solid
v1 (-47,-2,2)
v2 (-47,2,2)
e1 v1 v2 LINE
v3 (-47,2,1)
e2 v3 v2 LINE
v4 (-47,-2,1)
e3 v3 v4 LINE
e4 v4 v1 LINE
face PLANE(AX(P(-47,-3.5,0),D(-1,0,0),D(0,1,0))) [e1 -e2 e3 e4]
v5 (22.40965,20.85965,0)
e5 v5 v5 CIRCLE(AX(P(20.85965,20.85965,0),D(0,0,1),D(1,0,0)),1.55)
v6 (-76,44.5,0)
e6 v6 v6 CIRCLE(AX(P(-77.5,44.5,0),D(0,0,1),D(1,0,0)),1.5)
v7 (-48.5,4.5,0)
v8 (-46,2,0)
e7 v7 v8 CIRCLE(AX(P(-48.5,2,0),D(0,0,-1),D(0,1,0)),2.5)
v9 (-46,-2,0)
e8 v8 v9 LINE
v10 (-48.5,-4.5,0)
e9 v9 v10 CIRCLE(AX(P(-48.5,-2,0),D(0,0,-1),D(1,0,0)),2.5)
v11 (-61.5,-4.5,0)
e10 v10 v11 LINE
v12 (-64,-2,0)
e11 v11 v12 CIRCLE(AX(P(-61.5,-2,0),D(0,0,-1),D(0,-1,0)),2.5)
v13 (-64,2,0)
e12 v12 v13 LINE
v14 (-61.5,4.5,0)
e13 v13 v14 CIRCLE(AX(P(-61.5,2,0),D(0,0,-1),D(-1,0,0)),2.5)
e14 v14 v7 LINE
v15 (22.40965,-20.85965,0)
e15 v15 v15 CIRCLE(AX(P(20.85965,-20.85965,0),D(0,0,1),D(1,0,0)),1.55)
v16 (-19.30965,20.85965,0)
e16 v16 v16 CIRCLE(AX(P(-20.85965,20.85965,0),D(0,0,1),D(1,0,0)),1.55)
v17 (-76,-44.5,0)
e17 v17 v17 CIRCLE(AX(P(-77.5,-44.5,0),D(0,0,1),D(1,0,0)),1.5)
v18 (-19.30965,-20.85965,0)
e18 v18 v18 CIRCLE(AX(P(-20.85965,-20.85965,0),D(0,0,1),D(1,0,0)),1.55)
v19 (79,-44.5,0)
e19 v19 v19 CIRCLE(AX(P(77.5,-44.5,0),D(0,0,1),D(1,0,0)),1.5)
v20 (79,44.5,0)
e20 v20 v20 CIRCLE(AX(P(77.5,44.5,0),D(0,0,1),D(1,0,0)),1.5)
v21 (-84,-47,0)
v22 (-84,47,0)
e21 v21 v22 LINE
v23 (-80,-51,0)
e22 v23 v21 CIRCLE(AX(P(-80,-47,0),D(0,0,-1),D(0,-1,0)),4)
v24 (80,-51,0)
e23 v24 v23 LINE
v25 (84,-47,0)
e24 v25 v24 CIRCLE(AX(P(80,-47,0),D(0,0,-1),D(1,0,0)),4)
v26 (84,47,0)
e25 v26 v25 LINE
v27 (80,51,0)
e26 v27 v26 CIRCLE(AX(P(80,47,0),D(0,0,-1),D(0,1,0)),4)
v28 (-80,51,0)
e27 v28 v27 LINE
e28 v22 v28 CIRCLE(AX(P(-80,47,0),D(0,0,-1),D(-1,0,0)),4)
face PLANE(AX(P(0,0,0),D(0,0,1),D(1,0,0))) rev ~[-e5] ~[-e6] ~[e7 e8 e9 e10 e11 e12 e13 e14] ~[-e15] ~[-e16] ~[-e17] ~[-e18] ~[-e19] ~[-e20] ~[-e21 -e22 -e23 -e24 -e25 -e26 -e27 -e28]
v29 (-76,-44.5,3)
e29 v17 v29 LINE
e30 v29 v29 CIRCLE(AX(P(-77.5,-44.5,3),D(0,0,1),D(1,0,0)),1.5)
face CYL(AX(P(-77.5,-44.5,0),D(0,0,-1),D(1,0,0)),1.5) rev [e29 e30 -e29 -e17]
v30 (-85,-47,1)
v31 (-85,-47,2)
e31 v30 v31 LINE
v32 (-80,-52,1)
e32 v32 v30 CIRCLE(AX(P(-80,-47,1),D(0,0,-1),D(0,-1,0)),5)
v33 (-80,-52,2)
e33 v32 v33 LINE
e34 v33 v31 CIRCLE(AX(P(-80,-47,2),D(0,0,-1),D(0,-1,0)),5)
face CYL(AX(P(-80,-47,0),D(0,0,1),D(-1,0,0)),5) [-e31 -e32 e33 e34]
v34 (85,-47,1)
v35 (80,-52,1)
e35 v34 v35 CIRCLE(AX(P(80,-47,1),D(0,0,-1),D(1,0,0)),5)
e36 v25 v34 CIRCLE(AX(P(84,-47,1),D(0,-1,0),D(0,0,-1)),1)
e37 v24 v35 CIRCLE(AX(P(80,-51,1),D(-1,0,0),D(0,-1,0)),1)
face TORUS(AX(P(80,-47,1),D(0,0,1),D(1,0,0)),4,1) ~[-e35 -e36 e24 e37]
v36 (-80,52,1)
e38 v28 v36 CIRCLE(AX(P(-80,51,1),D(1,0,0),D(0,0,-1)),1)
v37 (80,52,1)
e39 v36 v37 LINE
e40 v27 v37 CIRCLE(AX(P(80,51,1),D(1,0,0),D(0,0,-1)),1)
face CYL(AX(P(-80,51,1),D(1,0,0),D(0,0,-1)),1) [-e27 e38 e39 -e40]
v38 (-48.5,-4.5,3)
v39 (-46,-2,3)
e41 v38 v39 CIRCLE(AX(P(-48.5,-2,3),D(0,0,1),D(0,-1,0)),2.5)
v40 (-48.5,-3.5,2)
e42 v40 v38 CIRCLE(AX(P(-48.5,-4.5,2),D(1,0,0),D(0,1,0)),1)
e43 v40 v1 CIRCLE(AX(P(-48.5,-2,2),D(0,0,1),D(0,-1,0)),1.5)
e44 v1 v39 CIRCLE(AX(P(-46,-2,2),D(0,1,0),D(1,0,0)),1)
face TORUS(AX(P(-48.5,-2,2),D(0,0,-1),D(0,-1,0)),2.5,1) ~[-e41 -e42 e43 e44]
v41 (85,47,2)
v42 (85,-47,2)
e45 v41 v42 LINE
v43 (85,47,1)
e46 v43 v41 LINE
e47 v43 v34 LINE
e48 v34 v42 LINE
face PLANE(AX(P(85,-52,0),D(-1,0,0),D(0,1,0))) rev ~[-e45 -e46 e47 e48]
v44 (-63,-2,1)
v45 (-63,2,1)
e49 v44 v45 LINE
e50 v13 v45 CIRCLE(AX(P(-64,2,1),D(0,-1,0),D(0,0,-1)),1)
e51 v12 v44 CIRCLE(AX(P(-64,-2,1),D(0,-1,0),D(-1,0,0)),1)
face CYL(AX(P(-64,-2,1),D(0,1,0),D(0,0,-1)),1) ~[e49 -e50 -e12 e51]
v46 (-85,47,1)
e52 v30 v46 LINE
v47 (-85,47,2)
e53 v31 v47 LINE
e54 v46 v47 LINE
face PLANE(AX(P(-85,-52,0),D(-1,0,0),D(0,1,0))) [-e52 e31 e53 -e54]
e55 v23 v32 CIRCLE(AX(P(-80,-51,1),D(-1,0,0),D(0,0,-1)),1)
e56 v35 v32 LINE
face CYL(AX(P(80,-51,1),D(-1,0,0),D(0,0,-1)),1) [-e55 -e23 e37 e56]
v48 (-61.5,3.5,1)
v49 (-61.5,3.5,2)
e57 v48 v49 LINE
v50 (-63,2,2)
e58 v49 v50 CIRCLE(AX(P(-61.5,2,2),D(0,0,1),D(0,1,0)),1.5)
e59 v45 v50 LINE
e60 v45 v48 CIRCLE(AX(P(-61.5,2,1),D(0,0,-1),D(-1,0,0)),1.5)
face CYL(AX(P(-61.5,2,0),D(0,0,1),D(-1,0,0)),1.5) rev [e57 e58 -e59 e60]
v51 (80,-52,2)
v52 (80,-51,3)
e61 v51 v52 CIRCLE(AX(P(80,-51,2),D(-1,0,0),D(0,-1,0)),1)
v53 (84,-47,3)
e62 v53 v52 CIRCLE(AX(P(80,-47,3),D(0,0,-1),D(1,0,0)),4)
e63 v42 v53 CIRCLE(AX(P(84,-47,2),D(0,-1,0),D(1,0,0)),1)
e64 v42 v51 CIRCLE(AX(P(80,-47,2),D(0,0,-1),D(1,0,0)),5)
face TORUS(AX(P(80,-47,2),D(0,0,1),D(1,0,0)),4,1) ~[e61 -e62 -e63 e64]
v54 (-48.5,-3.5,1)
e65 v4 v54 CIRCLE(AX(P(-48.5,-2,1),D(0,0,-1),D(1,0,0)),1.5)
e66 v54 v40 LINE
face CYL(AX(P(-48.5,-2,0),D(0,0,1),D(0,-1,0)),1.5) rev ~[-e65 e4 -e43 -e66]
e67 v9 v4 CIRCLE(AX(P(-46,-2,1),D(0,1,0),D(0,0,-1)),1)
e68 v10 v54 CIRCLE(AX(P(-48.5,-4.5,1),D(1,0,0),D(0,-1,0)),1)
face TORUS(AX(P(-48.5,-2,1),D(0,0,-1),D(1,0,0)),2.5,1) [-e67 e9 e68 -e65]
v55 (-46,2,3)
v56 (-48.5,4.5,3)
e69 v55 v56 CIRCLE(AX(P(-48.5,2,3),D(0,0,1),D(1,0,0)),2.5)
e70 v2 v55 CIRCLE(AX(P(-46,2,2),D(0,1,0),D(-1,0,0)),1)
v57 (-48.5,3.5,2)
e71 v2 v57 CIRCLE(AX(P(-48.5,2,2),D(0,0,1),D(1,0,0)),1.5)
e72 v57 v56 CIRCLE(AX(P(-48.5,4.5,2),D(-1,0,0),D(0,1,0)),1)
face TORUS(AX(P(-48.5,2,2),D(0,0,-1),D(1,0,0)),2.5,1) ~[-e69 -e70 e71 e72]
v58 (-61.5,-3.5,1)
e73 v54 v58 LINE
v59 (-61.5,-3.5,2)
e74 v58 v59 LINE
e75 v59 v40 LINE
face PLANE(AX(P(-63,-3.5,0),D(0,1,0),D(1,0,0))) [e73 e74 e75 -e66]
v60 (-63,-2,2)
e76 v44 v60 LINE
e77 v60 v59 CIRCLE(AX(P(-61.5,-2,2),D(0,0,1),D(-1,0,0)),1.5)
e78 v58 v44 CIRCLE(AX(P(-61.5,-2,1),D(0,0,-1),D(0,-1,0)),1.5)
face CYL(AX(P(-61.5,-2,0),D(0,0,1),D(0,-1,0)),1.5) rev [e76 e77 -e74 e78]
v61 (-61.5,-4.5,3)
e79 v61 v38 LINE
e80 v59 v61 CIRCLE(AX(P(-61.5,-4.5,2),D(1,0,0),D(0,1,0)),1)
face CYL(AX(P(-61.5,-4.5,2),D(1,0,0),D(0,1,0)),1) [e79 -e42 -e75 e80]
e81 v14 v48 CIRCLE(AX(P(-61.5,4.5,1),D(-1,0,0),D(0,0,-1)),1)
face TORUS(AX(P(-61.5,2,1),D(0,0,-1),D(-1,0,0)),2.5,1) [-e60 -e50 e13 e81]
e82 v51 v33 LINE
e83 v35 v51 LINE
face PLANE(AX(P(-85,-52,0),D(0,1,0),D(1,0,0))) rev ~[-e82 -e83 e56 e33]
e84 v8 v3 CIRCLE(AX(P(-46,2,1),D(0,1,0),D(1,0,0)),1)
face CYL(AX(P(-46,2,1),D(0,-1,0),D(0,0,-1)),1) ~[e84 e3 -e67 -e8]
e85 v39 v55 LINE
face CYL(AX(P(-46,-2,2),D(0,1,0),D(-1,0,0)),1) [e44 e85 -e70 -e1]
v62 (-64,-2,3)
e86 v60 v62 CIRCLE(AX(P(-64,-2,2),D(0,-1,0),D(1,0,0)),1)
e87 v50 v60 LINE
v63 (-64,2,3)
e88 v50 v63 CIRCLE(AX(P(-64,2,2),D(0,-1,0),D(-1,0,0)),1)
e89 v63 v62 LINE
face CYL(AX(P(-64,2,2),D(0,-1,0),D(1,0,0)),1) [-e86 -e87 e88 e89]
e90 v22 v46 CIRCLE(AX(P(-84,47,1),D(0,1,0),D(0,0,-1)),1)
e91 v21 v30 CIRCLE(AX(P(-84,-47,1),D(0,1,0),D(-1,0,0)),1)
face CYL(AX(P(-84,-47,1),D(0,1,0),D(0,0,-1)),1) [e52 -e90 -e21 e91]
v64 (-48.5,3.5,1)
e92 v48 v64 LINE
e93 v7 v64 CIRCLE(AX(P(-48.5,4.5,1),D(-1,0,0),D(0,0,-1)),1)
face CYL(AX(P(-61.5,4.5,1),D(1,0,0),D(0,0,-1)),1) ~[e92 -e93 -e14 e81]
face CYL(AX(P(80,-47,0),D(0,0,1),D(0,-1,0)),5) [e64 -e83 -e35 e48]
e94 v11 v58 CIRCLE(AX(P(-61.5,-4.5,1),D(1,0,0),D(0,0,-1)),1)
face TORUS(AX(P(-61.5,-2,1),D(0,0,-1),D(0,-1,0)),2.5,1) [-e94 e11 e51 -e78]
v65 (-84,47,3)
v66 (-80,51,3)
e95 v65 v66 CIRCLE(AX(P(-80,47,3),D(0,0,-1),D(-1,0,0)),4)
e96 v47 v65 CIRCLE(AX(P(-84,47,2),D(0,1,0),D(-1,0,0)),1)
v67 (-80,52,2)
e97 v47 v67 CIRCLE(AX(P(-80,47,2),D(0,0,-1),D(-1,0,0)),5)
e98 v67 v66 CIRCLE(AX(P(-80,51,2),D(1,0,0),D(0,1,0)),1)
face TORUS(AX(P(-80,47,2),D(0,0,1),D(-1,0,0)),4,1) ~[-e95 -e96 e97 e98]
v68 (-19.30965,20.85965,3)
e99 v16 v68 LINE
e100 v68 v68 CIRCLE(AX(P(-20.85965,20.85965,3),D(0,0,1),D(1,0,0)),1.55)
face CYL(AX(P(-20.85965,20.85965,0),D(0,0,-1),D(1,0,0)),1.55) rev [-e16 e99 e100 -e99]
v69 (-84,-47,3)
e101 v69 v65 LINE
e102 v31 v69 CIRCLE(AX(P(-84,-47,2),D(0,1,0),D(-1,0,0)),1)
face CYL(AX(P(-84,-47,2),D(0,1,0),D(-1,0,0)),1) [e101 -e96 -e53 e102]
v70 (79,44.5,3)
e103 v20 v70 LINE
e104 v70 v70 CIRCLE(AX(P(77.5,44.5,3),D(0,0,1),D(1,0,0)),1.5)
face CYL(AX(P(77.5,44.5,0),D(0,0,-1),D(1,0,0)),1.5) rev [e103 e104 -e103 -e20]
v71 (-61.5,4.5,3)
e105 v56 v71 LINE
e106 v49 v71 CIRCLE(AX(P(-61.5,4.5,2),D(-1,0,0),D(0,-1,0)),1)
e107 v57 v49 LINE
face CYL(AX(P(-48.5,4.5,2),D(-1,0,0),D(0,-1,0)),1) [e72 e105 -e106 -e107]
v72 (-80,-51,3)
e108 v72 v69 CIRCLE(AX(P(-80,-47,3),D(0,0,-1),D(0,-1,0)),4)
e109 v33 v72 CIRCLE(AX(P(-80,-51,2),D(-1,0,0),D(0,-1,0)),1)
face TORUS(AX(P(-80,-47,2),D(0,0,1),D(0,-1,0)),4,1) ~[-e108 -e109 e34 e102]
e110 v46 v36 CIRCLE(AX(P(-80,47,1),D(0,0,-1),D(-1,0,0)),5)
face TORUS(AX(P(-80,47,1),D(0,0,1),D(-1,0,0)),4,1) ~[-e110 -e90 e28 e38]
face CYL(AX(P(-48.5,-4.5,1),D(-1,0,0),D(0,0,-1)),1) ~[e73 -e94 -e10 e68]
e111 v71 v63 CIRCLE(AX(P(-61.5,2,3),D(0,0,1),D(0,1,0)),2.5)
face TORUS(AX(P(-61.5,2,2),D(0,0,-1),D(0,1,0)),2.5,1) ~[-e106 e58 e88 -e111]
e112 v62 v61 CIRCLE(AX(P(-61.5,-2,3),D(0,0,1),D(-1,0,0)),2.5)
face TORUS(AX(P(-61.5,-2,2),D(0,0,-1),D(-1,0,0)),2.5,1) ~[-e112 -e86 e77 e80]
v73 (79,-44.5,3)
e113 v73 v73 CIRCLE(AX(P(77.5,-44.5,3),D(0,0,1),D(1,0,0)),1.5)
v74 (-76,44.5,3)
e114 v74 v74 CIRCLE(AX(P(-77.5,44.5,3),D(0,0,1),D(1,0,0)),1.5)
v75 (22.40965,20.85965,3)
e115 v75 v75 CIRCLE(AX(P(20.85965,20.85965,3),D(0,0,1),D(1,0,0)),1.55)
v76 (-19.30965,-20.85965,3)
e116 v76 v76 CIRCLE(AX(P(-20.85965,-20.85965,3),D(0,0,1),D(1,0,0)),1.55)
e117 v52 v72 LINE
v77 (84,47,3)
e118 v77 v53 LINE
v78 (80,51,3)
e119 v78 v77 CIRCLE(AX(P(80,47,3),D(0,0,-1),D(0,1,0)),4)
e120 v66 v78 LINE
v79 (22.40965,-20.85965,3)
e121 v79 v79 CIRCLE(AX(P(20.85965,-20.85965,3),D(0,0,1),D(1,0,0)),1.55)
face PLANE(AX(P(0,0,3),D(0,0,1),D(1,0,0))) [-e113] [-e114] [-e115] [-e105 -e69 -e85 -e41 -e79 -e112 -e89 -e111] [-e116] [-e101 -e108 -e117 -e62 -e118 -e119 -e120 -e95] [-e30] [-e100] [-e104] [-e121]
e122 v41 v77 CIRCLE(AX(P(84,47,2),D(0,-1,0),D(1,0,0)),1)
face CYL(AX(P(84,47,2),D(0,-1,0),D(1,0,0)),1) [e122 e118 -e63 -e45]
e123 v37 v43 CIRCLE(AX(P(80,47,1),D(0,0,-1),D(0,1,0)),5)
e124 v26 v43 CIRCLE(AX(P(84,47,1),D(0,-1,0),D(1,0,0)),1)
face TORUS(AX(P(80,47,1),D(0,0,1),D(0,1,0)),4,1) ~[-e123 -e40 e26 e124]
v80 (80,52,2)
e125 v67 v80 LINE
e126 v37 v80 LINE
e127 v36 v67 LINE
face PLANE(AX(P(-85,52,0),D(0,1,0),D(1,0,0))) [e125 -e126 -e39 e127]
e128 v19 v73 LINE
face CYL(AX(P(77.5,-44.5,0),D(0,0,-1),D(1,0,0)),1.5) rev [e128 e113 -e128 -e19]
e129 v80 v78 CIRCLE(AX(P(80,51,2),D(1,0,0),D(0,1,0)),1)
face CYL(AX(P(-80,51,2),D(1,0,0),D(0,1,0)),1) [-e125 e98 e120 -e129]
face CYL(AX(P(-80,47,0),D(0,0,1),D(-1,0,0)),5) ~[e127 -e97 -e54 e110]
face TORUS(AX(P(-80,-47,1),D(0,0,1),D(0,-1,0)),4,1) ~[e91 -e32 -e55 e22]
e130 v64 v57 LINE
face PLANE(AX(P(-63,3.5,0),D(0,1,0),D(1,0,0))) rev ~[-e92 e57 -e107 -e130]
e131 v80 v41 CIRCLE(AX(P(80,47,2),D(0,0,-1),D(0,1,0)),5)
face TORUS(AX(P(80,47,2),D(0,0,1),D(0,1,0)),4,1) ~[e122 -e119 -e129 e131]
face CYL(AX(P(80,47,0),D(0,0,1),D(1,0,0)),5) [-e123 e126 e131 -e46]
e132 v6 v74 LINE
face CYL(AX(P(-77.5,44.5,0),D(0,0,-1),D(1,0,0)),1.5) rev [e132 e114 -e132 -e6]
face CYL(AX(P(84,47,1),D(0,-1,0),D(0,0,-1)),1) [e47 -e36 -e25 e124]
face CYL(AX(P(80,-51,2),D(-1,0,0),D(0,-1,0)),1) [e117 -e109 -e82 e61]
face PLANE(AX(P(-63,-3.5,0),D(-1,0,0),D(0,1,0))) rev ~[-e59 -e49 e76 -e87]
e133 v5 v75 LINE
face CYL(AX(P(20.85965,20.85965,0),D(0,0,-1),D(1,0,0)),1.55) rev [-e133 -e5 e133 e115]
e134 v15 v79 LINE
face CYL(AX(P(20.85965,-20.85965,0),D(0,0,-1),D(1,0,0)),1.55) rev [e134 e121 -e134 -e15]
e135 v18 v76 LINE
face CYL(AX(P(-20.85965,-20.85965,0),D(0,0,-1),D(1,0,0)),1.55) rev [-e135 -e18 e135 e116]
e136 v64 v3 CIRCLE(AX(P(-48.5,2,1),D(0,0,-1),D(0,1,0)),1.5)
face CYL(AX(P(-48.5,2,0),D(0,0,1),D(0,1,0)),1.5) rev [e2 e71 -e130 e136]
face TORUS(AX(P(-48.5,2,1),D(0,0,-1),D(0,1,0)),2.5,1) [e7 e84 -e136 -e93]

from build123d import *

# Parameters (mm, degrees)
F0_W     = 170
F0_H     = 104
F0_R     = 1.5
F0_R_2   = 2
F0_R_3   = 1.55
F0_W_2   = 16
F0_H_2   = 7
F1_DEPTH = 3
F2_R     = 5
F3_R     = 1.5
F4_R     = 1


with BuildPart() as f1:
    # F0 (on Top) → F1 (new body)
    with BuildSketch(Plane.XY):
        Rectangle(F0_W, F0_H)
        with Locations((-77.5, -44.5)):
            Circle(F0_R, mode=Mode.SUBTRACT)
        with Locations((-45, -40)):
            Circle(F0_R_2, mode=Mode.SUBTRACT)
        with Locations((-45, -30)):
            Circle(F0_R_2, mode=Mode.SUBTRACT)
        with Locations((-20.859650045, -20.859650045)):
            Circle(F0_R_3, mode=Mode.SUBTRACT)
        with Locations((77.5, -44.5)):
            Circle(F0_R, mode=Mode.SUBTRACT)
        with Locations((20.859650045, -20.859650045)):
            Circle(F0_R_3, mode=Mode.SUBTRACT)
        with Locations((-55, 0)):
            Rectangle(F0_W_2, F0_H_2, mode=Mode.SUBTRACT)
        with Locations((-20.859650045, 20.859650045)):
            Circle(F0_R_3, mode=Mode.SUBTRACT)
        with Locations((-45, 30)):
            Circle(F0_R_2, mode=Mode.SUBTRACT)
        with Locations((-77.5, 44.5)):
            Circle(F0_R, mode=Mode.SUBTRACT)
        with Locations((-45, 40)):
            Circle(F0_R_2, mode=Mode.SUBTRACT)
        with Locations((-10, 46)):
            Circle(F0_R_2, mode=Mode.SUBTRACT)
        with Locations((20.859650045, 20.859650045)):
            Circle(F0_R_3, mode=Mode.SUBTRACT)
        with Locations((0, 46)):
            Circle(F0_R_2, mode=Mode.SUBTRACT)
        with Locations((10, 46)):
            Circle(F0_R_2, mode=Mode.SUBTRACT)
        with Locations((77.5, 44.5)):
            Circle(F0_R, mode=Mode.SUBTRACT)
        with Locations((-45, 40)):
            Circle(F0_R_2)
        with Locations((-45, 30)):
            Circle(F0_R_2)
        with Locations((-45, -30)):
            Circle(F0_R_2)
        with Locations((-45, -40)):
            Circle(F0_R_2)
        with Locations((10, 46)):
            Circle(F0_R_2)
        with Locations((-10, 46)):
            Circle(F0_R_2)
        with Locations((0, 46)):
            Circle(F0_R_2)
    extrude(amount=F1_DEPTH)

    # F2
    f2_edges = [f1.edges().sort_by_distance(p)[0] for p in [
        (-85, -52, 1.5),
        (-85, 52, 1.5),
        (85, 52, 1.5),
        (85, -52, 1.5),
    ]]
    fillet(f2_edges, radius=F2_R)

    # F3
    f3_edges = [f1.edges().sort_by_distance(p)[0] for p in [
        (-47, 3.5, 1.5),
        (-47, -3.5, 1.5),
        (-63, -3.5, 1.5),
        (-63, 3.5, 1.5),
    ]]
    fillet(f3_edges, radius=F3_R)

    # F4
    f4_edges = [f1.edges().sort_by_distance(p)[0] for p in [
        (0, 52, 3),
        (0, 52, 0),
        (-55, -3.5, 3),
        (-55, 3.5, 0),
        (-55, -3.5, 0),
        (-47.43934, -3.06066, 0),
        (-62.56066, -3.06066, 0),
        (-47, 0, 0),
        (-63, 0, 0),
        (-47.43934, 3.06066, 0),
        (-62.56066, 3.06066, 0),
        (83.535534, 50.535534, 0),
        (-83.535534, 50.535534, 0),
        (85, 0, 0),
        (-85, 0, 0),
        (83.535534, -50.535534, 0),
        (-83.535534, -50.535534, 0),
        (0, -52, 0),
        (-47.43934, -3.06066, 3),
        (-62.56066, -3.06066, 3),
        (-47, 0, 3),
        (-63, 0, 3),
        (-47.43934, 3.06066, 3),
        (-62.56066, 3.06066, 3),
        (-55, 3.5, 3),
        (83.535534, 50.535534, 3),
        (-83.535534, 50.535534, 3),
        (85, 0, 3),
        (-85, 0, 3),
        (83.535534, -50.535534, 3),
        (-83.535534, -50.535534, 3),
        (0, -52, 3),
    ]]
    fillet(f4_edges, radius=F4_R)


solid = f1.part
